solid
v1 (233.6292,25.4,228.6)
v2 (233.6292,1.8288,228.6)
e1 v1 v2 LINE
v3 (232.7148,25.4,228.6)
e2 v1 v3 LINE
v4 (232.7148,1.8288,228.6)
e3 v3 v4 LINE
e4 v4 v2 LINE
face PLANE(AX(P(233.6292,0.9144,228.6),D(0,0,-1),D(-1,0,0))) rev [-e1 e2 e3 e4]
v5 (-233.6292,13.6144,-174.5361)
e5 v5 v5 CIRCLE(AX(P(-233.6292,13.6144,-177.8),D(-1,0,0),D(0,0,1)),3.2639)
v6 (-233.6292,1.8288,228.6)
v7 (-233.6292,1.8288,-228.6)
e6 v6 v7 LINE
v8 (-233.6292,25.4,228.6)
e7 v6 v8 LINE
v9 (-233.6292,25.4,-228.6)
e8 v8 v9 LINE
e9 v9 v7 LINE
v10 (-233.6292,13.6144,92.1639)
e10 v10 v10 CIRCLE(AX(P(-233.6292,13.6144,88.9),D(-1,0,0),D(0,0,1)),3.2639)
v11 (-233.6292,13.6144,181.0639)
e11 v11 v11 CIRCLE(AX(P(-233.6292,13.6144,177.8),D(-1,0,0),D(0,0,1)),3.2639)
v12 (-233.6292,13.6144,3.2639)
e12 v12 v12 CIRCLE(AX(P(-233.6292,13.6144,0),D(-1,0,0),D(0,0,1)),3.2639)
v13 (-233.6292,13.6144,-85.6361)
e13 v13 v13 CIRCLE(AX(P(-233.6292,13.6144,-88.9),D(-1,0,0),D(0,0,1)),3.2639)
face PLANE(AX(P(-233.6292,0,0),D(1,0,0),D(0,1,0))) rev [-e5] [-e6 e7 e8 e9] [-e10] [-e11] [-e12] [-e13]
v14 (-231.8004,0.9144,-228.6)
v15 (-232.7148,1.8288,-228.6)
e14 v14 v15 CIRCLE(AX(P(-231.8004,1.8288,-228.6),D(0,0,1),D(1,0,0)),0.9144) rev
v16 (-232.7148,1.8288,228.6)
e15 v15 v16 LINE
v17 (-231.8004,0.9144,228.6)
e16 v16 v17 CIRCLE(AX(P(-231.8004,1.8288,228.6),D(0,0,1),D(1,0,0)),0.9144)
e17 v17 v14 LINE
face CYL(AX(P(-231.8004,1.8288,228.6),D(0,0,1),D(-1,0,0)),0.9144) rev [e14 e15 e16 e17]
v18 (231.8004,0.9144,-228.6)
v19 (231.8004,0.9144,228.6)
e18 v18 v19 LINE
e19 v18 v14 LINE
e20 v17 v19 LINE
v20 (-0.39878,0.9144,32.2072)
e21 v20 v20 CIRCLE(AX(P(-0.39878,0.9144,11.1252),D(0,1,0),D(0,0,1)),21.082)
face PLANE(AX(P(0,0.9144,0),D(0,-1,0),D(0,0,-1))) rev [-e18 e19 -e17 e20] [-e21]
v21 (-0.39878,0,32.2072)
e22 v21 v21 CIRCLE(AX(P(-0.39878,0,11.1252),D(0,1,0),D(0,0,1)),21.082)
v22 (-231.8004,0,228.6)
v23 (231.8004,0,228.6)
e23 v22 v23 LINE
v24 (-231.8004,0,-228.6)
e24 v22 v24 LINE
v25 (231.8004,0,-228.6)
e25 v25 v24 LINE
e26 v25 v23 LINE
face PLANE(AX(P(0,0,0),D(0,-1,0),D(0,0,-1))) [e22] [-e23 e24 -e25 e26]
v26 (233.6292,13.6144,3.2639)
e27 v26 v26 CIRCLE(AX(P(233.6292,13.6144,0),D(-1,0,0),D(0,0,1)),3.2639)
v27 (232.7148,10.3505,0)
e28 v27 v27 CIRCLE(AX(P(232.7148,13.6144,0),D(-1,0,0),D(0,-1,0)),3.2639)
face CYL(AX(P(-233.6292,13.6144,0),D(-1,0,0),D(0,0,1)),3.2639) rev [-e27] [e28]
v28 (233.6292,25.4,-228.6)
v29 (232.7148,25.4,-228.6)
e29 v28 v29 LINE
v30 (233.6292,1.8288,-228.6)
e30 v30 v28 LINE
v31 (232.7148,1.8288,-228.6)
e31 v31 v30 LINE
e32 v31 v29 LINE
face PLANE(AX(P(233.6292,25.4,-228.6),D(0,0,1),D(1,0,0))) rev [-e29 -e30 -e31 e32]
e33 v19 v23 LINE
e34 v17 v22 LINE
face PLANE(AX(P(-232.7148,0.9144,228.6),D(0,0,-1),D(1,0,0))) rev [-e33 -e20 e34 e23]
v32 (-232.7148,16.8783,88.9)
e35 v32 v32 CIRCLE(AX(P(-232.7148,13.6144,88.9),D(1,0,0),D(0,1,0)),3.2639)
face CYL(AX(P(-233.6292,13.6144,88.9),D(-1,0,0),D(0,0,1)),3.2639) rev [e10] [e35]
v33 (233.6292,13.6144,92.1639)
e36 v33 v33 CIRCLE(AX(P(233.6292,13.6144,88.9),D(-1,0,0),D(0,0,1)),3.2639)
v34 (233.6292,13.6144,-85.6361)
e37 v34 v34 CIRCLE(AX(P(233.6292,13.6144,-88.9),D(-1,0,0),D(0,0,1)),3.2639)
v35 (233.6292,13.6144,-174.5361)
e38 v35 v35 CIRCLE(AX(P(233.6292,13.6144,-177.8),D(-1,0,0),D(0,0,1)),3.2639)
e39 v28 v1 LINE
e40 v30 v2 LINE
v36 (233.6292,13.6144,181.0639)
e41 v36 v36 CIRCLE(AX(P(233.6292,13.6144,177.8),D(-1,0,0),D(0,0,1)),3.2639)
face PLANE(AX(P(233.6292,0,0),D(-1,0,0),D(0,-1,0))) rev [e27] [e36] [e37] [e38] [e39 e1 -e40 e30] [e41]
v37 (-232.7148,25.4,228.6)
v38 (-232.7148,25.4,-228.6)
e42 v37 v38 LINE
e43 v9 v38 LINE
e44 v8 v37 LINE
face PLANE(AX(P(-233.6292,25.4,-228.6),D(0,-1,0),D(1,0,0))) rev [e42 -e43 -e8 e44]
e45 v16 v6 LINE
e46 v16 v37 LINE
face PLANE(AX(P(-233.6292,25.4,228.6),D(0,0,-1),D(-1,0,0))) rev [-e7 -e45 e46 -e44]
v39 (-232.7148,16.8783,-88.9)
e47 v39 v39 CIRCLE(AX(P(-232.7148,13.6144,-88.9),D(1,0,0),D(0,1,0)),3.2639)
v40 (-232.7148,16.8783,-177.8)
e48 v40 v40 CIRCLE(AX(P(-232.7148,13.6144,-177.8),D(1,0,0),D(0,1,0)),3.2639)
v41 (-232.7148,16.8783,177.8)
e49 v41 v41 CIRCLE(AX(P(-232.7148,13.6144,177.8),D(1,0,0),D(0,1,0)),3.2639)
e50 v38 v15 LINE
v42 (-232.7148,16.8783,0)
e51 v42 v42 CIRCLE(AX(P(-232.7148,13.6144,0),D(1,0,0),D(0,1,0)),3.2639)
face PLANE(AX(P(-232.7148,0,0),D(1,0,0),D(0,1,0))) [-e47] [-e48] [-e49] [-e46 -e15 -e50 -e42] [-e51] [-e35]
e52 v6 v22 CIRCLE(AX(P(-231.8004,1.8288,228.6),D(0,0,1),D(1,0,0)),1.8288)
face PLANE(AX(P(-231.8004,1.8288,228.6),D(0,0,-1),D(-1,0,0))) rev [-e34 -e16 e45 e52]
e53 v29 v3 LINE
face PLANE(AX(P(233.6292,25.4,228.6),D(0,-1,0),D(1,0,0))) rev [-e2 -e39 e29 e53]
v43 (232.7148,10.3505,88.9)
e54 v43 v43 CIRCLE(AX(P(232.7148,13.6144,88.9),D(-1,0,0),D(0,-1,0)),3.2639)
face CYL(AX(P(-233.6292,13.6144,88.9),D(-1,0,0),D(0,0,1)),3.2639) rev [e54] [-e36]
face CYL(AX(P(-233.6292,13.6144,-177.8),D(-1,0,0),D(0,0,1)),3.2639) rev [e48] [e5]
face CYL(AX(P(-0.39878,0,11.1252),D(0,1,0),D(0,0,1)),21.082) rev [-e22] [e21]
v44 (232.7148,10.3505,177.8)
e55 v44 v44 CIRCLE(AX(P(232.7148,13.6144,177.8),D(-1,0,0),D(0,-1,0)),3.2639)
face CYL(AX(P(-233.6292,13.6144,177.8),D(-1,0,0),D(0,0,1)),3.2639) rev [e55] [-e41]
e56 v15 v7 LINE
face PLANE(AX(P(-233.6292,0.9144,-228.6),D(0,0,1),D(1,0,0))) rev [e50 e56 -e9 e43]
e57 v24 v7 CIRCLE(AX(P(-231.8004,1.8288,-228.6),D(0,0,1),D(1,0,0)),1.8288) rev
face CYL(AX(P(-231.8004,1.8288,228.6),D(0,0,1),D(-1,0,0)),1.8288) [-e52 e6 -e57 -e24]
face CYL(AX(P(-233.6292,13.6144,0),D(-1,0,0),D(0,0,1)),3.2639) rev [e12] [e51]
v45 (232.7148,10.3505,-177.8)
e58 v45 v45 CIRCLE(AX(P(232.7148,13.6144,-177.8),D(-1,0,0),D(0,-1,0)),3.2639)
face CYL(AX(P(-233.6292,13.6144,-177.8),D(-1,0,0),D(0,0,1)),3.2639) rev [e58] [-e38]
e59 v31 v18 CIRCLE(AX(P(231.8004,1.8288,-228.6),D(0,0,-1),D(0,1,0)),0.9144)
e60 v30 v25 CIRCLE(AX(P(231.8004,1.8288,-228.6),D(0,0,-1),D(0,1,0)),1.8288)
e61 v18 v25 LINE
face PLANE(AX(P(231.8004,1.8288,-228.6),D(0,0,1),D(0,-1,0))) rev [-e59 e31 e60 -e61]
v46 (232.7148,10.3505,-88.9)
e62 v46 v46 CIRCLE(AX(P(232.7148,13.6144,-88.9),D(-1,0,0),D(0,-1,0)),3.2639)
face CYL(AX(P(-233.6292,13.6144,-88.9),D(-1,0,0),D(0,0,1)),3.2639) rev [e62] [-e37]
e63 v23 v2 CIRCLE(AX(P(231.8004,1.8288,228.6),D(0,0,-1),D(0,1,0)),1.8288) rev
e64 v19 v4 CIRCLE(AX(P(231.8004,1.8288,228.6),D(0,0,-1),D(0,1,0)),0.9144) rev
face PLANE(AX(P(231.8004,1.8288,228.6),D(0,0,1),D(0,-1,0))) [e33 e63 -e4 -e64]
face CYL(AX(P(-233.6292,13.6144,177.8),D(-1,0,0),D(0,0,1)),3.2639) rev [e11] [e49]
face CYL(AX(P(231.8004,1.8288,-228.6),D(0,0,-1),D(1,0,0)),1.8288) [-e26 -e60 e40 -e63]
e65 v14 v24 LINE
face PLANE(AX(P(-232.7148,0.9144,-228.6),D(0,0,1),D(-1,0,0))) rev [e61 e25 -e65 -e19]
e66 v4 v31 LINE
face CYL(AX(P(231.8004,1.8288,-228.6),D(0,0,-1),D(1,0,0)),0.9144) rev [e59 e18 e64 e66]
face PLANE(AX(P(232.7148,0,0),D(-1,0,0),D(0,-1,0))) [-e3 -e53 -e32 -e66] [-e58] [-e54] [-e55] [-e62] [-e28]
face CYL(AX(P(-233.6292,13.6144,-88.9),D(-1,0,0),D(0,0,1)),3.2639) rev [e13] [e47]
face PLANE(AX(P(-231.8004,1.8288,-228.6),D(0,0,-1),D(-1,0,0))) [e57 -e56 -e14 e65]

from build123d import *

# Parameters (mm, degrees)
SKETCH1_W                    = 465.4296
SKETCH1_H                    = 457.2
BOSS_EXTRUDE1_DEPTH          = 0.9144
EDGE_FLANGE1_STRIP_W         = 5.4864
EDGE_FLANGE1_STRIP_H         = 0.9144
EDGE_FLANGE1_STRIP_CUT_DEPTH = 457.2
EDGE_FLANGE1_DEPTH           = 457.2
EDGE_FLANGE2_STRIP_W         = 5.4864
EDGE_FLANGE2_STRIP_H         = 0.9144
EDGE_FLANGE2_STRIP_CUT_DEPTH = 457.2
EDGE_FLANGE2_DEPTH           = 457.2
CUT_EXTRUDE1_START           = -233.6292
CUT_EXTRUDE1_OUTLINE_R       = 3.2639
CUT_EXTRUDE1_DEPTH           = 467.2584
CUT_EXTRUDE1_START_2         = -0.9144
CUT_EXTRUDE1_2_OUTLINE_R     = 21.082
CUT_EXTRUDE1_2_DEPTH         = 0.9144


# Read off the part's stored shape, not the designer's step: Cut-Extrude1
# Sheet-metal steps are written as plain solids
with BuildPart() as part:
    # Sketch1 → Boss-Extrude1 (new body)
    with BuildSketch(Plane(origin=(0, 0, 0), x_dir=(1, 0, 0), z_dir=(0, 1, 0))):
        Rectangle(SKETCH1_W, SKETCH1_H)
    extrude(amount=BOSS_EXTRUDE1_DEPTH)

    # Edge-Flange1 strip (across the edge) → Edge-Flange1 strip cut (cut)
    with BuildSketch(Plane(origin=(-232.7148, 0.9144, -228.6), x_dir=(1, 0, 0), z_dir=(0, 0, 1))):
        with Locations((-1.8288, -0.4572)):
            Rectangle(EDGE_FLANGE1_STRIP_W, EDGE_FLANGE1_STRIP_H)
    extrude(amount=EDGE_FLANGE1_STRIP_CUT_DEPTH, mode=Mode.SUBTRACT)

    # Edge-Flange1 section (across the edge) → Edge-Flange1 (add)
    with BuildSketch(Plane(origin=(-232.7148, 0.9144, -228.6), x_dir=(1, 0, 0), z_dir=(0, 0, 1))):
        with BuildLine():
            Line((-0.9144, 0.9144), (-0.9144, 24.4856))
            Line((-0.9144, 24.4856), (0, 24.4856))
            Line((0, 24.4856), (0, 0.9144))
            ThreePointArc((0, 0.9144), (0.267821559, 0.267821559), (0.9144, 0))
            Line((0.9144, 0), (0.9144, -0.9144))
            ThreePointArc((0.9144, -0.9144), (-0.378756881, -0.378756881), (-0.9144, 0.9144))
        make_face()
    extrude(amount=EDGE_FLANGE1_DEPTH)

    # Edge-Flange2 strip (across the edge) → Edge-Flange2 strip cut (cut)
    with BuildSketch(Plane(origin=(232.7148, 0.9144, 228.6), x_dir=(-1, 0, 0), z_dir=(0, 0, -1))):
        with Locations((-1.8288, -0.4572)):
            Rectangle(EDGE_FLANGE2_STRIP_W, EDGE_FLANGE2_STRIP_H)
    extrude(amount=EDGE_FLANGE2_STRIP_CUT_DEPTH, mode=Mode.SUBTRACT)

    # Edge-Flange2 section (across the edge) → Edge-Flange2 (add)
    with BuildSketch(Plane(origin=(232.7148, 0.9144, 228.6), x_dir=(-1, 0, 0), z_dir=(0, 0, -1))):
        with BuildLine():
            Line((-0.9144, 0.9144), (-0.9144, 24.4856))
            Line((-0.9144, 24.4856), (0, 24.4856))
            Line((0, 24.4856), (0, 0.9144))
            ThreePointArc((0, 0.9144), (0.267821559, 0.267821559), (0.9144, 0))
            Line((0.9144, 0), (0.9144, -0.9144))
            ThreePointArc((0.9144, -0.9144), (-0.378756881, -0.378756881), (-0.9144, 0.9144))
        make_face()
    extrude(amount=EDGE_FLANGE2_DEPTH)

    # Cut-Extrude1 outline → Cut-Extrude1 (cut)
    with BuildSketch(Plane.YZ.offset(CUT_EXTRUDE1_START)):
        with Locations((13.6144, -177.8)):
            Circle(CUT_EXTRUDE1_OUTLINE_R)
        with Locations((13.6144, -88.9)):
            Circle(CUT_EXTRUDE1_OUTLINE_R)
        with Locations((13.6144, 0)):
            Circle(CUT_EXTRUDE1_OUTLINE_R)
        with Locations((13.6144, 88.9)):
            Circle(CUT_EXTRUDE1_OUTLINE_R)
        with Locations((13.6144, 177.8)):
            Circle(CUT_EXTRUDE1_OUTLINE_R)
    extrude(amount=CUT_EXTRUDE1_DEPTH, mode=Mode.SUBTRACT)

    # Cut-Extrude1 2 outline → Cut-Extrude1 2 (cut)
    with BuildSketch(Plane(origin=(0, 0.9144, 0), x_dir=(1, 0, 0), z_dir=(0, 1, 0)).offset(CUT_EXTRUDE1_START_2)):
        with Locations((-0.39878, -11.1252)):
            Circle(CUT_EXTRUDE1_2_OUTLINE_R)
    extrude(amount=CUT_EXTRUDE1_2_DEPTH, mode=Mode.SUBTRACT)


solid = part.part
